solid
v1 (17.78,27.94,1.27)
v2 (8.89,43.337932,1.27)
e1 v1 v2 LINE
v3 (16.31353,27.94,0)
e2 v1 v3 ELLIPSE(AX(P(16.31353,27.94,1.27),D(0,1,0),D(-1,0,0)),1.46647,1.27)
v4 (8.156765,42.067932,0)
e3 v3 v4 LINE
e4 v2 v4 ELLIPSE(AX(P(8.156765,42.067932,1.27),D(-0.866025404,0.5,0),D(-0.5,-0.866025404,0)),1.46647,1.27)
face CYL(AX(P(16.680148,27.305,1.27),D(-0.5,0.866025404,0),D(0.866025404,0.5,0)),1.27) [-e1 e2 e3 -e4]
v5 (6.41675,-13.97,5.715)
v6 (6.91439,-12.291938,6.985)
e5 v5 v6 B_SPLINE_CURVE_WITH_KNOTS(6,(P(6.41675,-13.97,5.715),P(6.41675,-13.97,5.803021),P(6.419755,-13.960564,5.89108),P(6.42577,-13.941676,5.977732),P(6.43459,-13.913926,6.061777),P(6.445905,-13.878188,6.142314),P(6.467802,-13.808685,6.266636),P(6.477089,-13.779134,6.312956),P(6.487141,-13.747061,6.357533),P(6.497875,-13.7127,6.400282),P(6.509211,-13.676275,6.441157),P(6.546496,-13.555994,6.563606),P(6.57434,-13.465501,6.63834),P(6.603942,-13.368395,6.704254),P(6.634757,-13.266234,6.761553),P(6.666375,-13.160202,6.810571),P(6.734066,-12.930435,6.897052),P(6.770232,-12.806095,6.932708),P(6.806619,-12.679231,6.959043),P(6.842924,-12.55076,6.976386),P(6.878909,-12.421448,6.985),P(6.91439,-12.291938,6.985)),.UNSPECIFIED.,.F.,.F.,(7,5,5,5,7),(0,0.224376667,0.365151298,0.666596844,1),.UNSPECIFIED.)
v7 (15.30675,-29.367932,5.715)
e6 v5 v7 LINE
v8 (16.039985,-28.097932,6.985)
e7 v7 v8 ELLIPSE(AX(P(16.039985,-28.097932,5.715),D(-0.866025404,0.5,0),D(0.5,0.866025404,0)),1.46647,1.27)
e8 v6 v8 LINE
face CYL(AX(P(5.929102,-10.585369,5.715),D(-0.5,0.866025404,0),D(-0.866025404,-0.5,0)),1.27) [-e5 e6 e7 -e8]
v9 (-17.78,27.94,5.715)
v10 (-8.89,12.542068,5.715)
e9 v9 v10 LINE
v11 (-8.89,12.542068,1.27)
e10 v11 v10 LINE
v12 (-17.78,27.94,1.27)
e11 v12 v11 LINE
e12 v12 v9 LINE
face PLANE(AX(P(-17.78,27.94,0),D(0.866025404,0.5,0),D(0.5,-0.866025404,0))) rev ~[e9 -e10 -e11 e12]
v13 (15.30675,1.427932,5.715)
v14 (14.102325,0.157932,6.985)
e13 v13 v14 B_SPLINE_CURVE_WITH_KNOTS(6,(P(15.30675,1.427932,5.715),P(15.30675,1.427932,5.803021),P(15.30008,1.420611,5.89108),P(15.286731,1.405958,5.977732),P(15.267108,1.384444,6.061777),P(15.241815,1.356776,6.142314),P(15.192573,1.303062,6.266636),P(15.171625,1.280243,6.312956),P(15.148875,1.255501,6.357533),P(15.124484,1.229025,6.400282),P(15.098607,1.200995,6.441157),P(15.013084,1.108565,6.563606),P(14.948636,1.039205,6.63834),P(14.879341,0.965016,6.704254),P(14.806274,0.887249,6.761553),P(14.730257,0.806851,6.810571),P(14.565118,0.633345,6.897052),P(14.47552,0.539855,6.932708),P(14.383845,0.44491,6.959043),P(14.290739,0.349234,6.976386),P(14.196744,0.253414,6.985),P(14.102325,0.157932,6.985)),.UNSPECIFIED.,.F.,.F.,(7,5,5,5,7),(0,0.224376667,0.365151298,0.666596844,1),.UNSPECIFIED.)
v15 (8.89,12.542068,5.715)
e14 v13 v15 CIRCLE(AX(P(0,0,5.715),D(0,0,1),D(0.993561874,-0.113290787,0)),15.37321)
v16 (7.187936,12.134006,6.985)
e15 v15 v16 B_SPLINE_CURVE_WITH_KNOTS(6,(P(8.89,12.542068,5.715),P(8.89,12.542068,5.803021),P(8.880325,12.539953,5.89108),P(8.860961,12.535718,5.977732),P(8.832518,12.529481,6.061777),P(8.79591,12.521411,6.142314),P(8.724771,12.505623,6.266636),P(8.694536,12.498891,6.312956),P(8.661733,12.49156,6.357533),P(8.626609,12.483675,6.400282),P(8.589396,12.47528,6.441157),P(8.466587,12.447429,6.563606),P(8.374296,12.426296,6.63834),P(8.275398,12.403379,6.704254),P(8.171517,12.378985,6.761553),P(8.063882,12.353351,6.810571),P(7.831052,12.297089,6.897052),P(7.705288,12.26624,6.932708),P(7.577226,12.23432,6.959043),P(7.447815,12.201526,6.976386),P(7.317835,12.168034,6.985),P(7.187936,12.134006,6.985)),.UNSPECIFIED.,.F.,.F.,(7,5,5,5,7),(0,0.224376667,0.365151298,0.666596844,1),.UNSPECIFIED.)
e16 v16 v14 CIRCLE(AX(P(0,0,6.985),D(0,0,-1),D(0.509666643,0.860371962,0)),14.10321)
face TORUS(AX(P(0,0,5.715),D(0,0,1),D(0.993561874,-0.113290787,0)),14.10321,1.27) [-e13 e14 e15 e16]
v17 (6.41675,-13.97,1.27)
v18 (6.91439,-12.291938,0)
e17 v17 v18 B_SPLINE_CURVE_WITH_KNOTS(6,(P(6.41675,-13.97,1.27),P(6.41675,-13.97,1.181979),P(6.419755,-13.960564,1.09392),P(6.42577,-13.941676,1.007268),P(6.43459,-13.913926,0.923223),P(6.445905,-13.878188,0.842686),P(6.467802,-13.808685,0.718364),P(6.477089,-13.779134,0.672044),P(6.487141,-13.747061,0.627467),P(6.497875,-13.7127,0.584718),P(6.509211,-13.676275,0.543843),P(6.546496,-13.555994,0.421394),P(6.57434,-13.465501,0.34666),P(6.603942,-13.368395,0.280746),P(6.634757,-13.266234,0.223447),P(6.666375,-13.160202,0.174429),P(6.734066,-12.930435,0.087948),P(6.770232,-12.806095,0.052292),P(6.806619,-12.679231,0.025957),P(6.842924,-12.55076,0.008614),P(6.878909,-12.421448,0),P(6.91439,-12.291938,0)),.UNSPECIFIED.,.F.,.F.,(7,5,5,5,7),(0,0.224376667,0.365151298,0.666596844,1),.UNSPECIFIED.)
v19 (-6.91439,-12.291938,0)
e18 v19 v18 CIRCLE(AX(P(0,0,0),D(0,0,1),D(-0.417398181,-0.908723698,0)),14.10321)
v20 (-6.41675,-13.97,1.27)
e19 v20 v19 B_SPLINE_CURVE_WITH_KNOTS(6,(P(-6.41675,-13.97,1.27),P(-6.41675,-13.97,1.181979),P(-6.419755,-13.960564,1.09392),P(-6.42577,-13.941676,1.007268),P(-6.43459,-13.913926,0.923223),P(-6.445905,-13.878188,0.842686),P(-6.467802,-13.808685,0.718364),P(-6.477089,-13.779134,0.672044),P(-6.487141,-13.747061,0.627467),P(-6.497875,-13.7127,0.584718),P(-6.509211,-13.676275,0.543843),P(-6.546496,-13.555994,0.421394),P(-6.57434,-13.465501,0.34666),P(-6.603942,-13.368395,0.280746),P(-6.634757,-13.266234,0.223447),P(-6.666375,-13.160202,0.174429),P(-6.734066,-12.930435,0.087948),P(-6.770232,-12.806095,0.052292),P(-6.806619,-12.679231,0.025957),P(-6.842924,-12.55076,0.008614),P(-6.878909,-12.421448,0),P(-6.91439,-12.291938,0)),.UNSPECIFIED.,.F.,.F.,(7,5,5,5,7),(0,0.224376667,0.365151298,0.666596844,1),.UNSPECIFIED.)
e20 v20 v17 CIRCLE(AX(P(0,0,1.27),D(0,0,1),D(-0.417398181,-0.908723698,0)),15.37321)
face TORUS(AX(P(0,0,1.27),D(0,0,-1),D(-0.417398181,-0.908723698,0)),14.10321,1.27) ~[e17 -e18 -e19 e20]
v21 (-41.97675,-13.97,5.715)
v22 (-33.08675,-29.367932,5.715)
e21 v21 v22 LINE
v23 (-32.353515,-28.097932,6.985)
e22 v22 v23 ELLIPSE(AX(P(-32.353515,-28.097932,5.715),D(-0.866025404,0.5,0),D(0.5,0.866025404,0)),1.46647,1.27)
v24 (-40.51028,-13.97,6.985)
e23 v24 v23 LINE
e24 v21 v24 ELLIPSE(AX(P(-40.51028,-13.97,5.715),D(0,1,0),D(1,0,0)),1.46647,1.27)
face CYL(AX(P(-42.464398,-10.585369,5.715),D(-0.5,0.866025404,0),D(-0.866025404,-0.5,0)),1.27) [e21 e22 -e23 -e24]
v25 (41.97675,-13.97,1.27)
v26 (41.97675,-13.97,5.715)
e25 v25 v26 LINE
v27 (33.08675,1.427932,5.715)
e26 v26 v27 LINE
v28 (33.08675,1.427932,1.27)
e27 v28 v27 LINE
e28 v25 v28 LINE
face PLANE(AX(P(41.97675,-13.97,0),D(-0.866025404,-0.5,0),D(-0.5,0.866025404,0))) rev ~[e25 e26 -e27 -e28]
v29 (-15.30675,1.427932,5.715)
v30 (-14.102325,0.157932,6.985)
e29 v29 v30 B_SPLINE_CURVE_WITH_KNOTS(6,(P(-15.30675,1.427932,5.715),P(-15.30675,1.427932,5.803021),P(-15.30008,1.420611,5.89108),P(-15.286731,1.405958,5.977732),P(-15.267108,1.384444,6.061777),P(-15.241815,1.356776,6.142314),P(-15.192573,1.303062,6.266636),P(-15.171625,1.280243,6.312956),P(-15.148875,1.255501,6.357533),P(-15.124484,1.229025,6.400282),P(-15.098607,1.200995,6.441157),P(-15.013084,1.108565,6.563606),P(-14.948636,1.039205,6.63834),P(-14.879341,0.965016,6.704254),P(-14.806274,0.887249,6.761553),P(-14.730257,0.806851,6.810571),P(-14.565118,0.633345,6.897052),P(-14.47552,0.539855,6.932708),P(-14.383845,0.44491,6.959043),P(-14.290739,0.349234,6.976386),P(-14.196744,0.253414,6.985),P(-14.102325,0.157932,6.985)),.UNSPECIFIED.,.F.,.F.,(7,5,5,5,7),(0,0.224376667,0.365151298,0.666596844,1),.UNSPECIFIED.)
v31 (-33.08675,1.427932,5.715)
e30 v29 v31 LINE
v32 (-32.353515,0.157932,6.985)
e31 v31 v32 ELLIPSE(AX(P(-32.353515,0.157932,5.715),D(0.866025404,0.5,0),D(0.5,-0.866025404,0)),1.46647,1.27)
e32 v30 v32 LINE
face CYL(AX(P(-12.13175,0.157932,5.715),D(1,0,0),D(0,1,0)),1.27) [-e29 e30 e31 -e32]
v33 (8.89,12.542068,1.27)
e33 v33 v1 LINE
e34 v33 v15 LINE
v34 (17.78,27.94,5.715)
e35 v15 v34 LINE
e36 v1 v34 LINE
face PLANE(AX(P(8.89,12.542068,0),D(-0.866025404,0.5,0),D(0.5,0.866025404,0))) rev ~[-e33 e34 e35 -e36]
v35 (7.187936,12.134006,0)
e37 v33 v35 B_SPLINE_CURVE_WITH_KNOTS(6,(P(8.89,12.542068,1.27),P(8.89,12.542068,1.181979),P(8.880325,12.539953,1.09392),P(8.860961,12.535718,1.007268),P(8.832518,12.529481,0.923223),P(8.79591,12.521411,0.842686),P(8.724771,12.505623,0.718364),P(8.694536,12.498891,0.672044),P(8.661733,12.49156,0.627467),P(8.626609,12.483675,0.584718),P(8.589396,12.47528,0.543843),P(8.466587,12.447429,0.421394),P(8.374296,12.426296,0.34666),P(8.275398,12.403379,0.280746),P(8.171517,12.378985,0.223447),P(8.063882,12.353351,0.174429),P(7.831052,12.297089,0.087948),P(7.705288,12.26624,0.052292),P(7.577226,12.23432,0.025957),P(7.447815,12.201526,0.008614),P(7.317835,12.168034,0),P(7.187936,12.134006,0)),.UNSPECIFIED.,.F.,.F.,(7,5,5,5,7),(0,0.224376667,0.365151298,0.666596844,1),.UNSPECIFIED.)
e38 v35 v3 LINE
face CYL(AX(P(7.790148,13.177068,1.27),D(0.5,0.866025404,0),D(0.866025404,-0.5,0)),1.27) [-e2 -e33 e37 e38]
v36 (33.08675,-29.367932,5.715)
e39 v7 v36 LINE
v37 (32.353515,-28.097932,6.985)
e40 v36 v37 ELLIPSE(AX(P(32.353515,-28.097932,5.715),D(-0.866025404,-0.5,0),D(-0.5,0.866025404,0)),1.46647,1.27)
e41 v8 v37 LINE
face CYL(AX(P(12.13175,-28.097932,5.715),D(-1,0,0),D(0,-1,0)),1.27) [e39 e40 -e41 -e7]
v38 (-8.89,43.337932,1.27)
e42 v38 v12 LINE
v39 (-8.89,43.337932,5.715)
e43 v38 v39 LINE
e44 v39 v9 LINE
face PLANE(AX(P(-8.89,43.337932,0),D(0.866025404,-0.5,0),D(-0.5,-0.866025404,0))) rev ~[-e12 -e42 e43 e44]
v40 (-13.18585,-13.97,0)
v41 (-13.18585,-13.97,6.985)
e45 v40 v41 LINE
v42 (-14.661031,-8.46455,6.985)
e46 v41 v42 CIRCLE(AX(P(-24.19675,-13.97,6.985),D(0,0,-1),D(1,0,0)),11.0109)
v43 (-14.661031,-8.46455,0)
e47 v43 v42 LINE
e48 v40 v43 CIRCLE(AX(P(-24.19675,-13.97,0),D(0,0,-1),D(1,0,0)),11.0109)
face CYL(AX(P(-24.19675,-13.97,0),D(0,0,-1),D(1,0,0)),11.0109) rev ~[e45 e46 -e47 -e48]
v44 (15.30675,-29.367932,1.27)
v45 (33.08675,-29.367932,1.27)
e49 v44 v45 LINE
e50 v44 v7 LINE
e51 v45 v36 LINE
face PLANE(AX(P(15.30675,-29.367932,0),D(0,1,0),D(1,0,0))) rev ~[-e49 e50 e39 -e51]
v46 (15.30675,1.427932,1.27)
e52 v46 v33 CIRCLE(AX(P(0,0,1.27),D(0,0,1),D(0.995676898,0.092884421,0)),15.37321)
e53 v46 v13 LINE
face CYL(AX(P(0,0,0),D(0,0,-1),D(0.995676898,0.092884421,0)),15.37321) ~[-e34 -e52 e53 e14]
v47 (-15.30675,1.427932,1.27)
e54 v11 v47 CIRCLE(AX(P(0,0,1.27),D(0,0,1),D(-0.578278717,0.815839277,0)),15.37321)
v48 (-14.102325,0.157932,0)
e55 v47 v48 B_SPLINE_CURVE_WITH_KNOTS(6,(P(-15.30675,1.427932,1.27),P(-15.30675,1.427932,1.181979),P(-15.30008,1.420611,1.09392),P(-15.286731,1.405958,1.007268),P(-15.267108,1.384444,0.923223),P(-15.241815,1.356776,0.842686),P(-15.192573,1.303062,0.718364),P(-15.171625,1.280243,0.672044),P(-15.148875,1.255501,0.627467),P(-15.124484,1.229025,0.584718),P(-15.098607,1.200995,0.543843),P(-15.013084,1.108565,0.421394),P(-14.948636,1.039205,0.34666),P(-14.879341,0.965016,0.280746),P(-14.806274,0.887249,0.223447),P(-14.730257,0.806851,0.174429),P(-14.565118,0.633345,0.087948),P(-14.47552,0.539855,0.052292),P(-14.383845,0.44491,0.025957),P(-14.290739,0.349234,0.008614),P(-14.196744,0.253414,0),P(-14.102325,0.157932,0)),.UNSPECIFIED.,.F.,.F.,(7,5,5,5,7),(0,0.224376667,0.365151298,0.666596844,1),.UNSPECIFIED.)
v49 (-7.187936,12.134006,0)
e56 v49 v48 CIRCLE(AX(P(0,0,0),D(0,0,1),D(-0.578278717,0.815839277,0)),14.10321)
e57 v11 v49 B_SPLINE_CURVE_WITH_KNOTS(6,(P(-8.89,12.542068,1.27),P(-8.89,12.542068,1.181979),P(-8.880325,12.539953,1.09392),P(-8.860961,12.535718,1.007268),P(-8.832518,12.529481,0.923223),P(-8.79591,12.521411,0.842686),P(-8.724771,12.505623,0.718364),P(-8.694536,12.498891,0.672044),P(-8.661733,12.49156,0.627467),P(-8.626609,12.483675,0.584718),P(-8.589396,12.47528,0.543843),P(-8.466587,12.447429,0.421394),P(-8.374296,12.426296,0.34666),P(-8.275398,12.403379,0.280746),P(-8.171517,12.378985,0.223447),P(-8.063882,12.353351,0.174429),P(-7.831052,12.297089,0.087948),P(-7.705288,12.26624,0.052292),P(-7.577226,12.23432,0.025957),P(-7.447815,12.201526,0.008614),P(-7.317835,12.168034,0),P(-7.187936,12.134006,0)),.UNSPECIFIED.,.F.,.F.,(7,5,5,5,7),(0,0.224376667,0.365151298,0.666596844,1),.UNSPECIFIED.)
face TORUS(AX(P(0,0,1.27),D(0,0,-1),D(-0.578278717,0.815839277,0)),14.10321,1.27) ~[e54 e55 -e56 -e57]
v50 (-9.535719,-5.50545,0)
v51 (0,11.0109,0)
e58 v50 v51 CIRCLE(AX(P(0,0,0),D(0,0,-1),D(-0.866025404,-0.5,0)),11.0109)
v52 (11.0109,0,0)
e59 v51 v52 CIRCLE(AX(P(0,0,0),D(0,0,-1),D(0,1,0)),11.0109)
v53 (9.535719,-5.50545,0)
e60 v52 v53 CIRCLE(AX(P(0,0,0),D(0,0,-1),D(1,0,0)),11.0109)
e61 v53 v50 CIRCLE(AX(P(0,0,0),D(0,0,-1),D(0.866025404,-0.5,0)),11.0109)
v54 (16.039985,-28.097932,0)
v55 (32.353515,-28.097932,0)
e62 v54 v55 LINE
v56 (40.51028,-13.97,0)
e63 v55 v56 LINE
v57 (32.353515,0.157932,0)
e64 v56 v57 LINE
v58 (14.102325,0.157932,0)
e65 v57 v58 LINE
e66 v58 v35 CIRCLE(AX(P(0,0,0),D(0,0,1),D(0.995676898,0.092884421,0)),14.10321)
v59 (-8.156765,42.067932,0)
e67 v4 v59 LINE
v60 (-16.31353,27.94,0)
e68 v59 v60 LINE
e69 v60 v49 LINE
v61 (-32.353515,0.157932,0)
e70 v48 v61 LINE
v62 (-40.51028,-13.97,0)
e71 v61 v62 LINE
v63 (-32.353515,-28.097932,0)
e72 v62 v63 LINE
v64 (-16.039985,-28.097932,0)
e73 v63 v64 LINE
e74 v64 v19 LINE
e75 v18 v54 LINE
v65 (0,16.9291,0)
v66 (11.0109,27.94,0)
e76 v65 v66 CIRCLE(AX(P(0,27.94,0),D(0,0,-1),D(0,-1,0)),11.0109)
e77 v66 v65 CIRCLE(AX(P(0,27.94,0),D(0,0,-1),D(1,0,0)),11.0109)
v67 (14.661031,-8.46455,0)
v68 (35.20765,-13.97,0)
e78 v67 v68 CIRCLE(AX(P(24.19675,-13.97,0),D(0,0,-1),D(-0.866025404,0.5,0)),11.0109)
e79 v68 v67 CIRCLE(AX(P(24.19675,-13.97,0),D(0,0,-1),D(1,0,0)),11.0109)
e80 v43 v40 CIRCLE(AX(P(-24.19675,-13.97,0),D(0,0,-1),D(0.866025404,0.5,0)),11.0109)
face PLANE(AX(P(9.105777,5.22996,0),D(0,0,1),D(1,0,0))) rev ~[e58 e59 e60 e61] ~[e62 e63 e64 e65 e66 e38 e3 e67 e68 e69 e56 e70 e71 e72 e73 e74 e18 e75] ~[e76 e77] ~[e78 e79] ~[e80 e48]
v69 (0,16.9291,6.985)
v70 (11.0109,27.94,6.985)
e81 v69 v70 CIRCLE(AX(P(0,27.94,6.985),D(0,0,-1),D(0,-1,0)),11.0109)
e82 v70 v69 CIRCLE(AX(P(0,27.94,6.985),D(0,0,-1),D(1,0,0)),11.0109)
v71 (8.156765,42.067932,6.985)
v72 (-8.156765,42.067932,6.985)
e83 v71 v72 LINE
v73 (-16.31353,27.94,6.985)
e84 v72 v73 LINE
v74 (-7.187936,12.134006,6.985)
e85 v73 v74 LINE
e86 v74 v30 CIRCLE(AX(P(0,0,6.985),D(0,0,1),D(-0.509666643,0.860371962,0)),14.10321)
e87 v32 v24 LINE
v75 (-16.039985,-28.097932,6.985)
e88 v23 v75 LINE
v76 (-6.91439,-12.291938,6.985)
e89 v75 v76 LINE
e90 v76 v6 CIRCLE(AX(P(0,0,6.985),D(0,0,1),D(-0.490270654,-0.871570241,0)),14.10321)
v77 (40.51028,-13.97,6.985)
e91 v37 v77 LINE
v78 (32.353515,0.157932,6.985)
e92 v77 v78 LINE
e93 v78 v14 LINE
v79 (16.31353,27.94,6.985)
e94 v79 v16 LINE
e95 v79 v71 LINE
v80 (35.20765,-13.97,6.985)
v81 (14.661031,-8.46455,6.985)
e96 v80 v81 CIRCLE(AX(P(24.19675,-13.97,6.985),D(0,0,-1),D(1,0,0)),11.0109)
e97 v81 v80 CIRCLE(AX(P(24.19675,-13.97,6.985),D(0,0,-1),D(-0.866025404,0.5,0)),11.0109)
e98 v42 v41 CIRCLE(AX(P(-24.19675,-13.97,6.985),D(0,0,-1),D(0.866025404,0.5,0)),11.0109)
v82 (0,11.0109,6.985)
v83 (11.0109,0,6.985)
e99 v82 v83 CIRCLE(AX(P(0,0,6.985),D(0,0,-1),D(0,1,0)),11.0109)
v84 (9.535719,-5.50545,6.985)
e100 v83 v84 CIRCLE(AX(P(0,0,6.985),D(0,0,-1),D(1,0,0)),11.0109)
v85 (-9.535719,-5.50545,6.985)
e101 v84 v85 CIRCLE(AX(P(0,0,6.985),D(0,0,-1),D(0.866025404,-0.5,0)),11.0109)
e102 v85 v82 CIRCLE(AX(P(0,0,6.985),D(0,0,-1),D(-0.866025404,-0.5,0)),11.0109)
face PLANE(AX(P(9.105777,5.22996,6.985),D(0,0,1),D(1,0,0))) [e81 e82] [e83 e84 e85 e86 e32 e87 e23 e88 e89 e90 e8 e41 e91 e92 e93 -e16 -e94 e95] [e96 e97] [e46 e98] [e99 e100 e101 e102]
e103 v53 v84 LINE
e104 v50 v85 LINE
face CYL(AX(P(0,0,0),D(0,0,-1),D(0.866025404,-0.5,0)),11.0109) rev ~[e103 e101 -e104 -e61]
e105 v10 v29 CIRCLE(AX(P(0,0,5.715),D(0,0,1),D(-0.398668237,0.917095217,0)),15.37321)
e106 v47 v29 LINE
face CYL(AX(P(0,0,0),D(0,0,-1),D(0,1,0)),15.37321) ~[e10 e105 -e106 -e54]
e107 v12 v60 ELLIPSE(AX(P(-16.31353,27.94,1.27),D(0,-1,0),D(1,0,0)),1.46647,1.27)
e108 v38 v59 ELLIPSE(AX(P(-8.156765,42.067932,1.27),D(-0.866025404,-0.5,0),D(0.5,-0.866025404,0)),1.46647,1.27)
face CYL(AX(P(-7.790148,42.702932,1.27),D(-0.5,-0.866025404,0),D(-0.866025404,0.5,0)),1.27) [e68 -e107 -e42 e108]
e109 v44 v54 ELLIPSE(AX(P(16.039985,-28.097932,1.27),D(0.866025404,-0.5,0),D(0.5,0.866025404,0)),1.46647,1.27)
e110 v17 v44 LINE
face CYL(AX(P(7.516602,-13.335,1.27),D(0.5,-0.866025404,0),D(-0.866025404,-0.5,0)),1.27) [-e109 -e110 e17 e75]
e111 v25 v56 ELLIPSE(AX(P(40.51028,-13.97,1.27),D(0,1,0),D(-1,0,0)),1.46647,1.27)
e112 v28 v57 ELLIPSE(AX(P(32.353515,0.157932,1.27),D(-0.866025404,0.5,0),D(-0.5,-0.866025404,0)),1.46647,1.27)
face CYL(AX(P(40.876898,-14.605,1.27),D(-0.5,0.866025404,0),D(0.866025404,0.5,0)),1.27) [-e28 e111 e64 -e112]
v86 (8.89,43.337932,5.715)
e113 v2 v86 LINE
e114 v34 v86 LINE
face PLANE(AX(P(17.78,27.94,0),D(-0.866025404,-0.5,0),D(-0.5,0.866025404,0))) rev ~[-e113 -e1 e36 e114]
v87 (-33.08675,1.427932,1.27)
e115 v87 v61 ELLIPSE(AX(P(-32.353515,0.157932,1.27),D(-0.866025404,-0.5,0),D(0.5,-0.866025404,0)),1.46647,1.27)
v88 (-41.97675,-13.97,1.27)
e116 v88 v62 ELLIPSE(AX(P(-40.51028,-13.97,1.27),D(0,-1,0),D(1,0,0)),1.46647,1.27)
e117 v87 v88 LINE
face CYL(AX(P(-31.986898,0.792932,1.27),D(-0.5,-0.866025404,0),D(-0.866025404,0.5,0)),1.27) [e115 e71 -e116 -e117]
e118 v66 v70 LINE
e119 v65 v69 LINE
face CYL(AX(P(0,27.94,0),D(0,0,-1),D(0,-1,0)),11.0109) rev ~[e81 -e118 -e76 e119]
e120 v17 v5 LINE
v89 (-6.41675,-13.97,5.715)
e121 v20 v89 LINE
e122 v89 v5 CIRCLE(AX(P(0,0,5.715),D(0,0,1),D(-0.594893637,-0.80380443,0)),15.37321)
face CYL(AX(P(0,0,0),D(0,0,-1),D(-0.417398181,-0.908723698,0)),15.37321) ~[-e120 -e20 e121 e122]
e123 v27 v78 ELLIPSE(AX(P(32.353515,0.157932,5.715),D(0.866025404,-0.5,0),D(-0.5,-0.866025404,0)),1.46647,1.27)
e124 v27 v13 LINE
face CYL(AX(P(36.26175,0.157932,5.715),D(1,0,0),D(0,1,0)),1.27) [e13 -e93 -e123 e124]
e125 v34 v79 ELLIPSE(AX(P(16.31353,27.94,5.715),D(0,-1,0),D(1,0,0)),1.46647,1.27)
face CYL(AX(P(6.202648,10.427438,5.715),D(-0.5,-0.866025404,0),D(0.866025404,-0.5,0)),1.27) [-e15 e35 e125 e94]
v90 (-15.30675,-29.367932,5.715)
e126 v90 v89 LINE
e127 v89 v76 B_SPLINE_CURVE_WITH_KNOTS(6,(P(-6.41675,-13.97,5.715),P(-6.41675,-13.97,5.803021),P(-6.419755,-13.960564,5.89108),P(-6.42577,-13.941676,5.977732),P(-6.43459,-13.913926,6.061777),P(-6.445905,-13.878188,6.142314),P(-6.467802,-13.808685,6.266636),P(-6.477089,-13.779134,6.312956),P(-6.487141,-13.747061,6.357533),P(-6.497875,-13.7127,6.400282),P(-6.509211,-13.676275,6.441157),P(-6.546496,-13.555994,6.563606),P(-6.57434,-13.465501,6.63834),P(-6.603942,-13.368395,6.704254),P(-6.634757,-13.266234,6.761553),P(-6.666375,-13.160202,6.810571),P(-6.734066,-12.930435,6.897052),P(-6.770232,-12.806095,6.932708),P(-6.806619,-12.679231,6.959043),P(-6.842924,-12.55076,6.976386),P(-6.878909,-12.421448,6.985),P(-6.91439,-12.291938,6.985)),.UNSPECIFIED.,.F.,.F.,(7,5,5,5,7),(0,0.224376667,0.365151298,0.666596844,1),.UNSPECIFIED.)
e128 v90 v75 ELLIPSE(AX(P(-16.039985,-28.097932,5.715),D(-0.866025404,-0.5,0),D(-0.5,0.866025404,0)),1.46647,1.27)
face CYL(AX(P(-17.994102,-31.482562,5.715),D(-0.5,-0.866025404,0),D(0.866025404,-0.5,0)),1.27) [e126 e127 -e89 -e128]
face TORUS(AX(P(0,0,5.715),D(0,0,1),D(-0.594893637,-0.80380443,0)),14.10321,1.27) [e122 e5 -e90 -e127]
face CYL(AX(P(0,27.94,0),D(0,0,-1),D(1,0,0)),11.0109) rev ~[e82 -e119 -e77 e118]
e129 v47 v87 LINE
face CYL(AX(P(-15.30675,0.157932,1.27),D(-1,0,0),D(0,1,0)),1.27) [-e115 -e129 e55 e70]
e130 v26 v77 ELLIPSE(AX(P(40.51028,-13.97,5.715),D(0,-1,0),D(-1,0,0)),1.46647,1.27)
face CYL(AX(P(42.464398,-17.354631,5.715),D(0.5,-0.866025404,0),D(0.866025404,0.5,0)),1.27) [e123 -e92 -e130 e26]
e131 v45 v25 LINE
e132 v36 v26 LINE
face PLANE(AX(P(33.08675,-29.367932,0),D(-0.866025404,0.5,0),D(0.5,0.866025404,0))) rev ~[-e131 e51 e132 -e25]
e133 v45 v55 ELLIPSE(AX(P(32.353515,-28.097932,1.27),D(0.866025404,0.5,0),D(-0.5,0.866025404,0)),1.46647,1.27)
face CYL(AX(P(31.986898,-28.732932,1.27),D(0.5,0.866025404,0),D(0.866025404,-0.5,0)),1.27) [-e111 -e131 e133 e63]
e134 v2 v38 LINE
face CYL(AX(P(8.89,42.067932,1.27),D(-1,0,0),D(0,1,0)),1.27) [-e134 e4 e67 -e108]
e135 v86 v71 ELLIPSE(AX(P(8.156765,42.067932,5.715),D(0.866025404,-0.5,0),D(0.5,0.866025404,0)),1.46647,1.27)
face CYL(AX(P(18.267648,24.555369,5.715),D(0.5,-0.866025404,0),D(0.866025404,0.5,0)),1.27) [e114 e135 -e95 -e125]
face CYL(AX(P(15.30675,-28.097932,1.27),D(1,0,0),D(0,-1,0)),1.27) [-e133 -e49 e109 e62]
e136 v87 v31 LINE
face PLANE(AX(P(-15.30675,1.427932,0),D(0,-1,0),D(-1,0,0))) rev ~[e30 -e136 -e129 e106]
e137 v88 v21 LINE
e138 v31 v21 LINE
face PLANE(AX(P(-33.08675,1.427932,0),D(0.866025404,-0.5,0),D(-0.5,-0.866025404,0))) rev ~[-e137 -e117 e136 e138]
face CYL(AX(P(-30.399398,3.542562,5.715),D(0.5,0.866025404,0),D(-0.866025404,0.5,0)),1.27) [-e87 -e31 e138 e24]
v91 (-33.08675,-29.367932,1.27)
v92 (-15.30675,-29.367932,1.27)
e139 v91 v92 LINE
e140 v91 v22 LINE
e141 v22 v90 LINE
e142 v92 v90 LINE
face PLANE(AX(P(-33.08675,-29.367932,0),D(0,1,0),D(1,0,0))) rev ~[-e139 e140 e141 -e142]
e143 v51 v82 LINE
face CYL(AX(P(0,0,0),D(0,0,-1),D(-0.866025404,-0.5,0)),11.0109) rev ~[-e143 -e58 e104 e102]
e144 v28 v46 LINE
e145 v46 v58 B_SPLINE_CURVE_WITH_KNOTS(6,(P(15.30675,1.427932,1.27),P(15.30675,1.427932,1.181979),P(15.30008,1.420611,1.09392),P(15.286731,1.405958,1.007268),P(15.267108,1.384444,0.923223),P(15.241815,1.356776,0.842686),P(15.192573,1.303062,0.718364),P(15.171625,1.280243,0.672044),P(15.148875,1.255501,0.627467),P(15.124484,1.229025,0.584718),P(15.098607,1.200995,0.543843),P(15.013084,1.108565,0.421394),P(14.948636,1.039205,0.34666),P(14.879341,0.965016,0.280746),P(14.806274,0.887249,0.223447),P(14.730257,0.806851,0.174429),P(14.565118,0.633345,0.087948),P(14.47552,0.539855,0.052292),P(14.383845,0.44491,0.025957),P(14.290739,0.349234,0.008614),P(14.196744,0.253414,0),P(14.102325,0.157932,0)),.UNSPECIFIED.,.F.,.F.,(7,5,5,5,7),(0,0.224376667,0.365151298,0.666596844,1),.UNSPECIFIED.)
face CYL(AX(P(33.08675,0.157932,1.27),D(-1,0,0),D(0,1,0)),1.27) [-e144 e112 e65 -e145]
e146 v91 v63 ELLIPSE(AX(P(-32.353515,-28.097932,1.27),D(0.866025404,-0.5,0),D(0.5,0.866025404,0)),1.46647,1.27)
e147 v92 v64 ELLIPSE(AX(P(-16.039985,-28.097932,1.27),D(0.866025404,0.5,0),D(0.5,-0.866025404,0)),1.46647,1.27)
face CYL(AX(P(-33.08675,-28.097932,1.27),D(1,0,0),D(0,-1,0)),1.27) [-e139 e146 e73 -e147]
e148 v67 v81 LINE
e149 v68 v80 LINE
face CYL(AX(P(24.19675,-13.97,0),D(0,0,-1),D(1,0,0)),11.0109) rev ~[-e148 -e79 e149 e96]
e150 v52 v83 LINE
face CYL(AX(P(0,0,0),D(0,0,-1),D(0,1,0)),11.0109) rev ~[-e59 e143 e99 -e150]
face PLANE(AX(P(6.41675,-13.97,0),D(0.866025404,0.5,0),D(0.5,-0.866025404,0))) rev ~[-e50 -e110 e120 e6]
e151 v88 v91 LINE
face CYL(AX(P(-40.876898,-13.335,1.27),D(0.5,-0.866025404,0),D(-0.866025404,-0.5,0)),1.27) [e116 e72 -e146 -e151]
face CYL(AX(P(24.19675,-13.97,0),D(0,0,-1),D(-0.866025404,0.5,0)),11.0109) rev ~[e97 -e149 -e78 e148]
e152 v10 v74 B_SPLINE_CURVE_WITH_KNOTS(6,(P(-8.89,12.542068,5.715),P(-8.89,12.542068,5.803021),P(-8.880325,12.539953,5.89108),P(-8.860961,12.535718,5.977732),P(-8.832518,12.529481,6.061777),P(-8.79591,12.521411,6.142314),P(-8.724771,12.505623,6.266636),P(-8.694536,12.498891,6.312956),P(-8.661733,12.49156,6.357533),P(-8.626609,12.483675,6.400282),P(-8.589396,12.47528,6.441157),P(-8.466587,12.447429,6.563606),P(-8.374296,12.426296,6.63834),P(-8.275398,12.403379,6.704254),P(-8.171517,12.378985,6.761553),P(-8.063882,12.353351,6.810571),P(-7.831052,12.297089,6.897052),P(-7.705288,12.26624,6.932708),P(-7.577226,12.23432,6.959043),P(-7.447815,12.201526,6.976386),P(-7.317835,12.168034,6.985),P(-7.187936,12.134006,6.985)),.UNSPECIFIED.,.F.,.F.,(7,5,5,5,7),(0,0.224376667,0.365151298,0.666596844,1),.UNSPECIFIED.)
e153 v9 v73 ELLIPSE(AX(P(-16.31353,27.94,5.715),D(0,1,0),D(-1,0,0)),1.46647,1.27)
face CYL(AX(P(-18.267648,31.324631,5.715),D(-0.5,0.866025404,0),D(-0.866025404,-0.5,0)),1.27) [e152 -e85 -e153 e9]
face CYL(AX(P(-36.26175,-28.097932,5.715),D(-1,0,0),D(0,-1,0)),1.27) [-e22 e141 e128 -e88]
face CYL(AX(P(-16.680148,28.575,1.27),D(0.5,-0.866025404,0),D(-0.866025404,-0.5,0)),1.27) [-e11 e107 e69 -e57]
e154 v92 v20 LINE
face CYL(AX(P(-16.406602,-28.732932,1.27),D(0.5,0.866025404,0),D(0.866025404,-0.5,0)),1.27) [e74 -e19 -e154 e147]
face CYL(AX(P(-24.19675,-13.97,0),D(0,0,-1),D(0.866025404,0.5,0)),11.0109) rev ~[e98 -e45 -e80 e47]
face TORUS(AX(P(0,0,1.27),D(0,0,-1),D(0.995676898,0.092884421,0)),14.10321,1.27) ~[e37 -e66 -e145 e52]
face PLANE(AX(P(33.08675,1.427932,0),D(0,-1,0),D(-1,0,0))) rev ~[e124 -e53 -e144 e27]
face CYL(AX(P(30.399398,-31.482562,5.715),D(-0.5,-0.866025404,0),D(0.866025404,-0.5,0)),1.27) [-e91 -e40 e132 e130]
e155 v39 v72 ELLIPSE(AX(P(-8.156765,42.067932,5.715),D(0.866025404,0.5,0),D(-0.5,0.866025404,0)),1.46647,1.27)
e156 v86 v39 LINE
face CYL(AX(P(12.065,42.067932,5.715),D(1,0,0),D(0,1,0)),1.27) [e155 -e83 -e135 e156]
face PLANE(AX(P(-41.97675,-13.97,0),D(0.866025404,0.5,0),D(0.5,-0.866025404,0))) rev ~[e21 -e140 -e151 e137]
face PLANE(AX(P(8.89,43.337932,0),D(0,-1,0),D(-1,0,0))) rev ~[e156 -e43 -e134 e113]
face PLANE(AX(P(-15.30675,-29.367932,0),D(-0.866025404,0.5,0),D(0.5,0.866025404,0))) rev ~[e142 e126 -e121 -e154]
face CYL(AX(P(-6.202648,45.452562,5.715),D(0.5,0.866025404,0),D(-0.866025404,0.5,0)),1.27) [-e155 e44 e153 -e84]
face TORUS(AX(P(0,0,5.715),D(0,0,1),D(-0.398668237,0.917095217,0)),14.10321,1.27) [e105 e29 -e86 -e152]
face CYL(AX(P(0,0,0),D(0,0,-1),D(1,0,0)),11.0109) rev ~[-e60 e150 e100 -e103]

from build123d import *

# Parameters (mm, degrees)
F1_DEPTH      = 6.985
F2_T3_DEPTH   = 24.13
F2_S4_R       = 15.3732097417
F2_T5_DEPTH   = 14
F2_T8_DEPTH   = 24.13
F2_T11_DEPTH  = 24.13
F2_T14_DEPTH  = 24.13
F2_T17_DEPTH  = 24.13
F2_S18_R      = 15.3732097417
F2_T19_DEPTH  = 14
F2_T22_ANGLE  = 73.0101001262
F2_T27_ANGLE  = 73.0101001262
F2_T32_DEPTH  = 24.13
F2_S33_R      = 15.3732097417
F2_T34_DEPTH  = 14
F2_T37_DEPTH  = 24.13
F2_T40_DEPTH  = 24.13
F2_T43_DEPTH  = 24.13
F2_T46_ANGLE  = 73.0101001262
F2_T51_DEPTH  = 24.13
F2_S52_R      = 15.3732097417
F2_T53_DEPTH  = 14
F2_T56_DEPTH  = 24.13
F2_T59_DEPTH  = 24.13
F2_T62_DEPTH  = 24.13
F2_T65_DEPTH  = 24.13
F2_S66_R      = 15.3732097417
F2_T67_DEPTH  = 14
F2_T70_DEPTH  = 24.13
F2_S71_R      = 15.3732097417
F2_T72_DEPTH  = 14
F2_T76_DEPTH  = 24.13
F2_S77_R      = 15.3732097417
F2_T78_DEPTH  = 14
F2_T81_ANGLE  = 73.0101001262
F2_T87_DEPTH  = 24.13
F2_S88_R      = 15.3732097417
F2_T89_DEPTH  = 14
F2_T92_ANGLE  = 73.0101001262
F2_T98_DEPTH  = 24.13
F2_S99_R      = 15.3732097417
F2_T100_DEPTH = 14
F2_T103_ANGLE = 73.0101001262
F2_T109_ANGLE = 73.0101001262
F2_T113_DEPTH = 24.13
F2_S114_R     = 15.3732097417
F2_T115_DEPTH = 14
F2_T120_DEPTH = 24.13
F2_S121_R     = 15.3732097417
F2_T122_DEPTH = 14
F2_T125_ANGLE = 73.0101001262
F2_T131_ANGLE = 73.0101001262
F2_T135_DEPTH = 24.13
F2_S136_R     = 15.3732097417
F2_T137_DEPTH = 14
F3_R          = 1.27


# Not quite as in the source:
# - a fillet or chamfer that OpenCascade refuses, or shapes differently, is made with other operations: its cross-section is extruded or revolved along the edge and cut away or added


with BuildPart() as f1:
    # F0 (on Top) → F1 (new body)
    with BuildSketch(Plane.XY):
        with BuildLine():
            ThreePointArc((0, 11.0109), (7.785882057, 7.785882057), (11.0109, 0))
            ThreePointArc((11.0109, 0), (10.6357126807, -2.8498306237), (9.5357191185, -5.50545))
            Line((9.5357191185, -5.50545), (10.8617497817, -6.2710341604))
            Line((10.8617497817, -6.2710341604), (15.3067497817, 1.4279316793))
            ThreePointArc((15.3067497817, 1.4279316793), (13.313590174, 7.6866048708), (8.89, 12.5420683207))
            Line((8.89, 12.5420683207), (0, 12.5420683207))
            Line((0, 12.5420683207), (0, 11.0109))
        make_face()
        with BuildLine():
            ThreePointArc((-9.5357191185, -5.50545), (-9.5357191185, 5.50545), (0, 11.0109))
            Line((0, 11.0109), (0, 12.5420683207))
            Line((0, 12.5420683207), (-8.89, 12.5420683207))
            ThreePointArc((-8.89, 12.5420683207), (-13.313590174, 7.6866048708), (-15.3067497817, 1.4279316793))
            Line((-15.3067497817, 1.4279316793), (-10.8617497817, -6.2710341604))
            Line((-10.8617497817, -6.2710341604), (-9.5357191185, -5.50545))
        make_face()
        with BuildLine():
            Line((10.8617497817, -6.2710341604), (9.5357191185, -5.50545))
            ThreePointArc((9.5357191185, -5.50545), (0, -11.0109), (-9.5357191185, -5.50545))
            Line((-9.5357191185, -5.50545), (-10.8617497817, -6.2710341604))
            Line((-10.8617497817, -6.2710341604), (-6.4167497817, -13.97))
            ThreePointArc((-6.4167497817, -13.97), (0, -15.3732097417), (6.4167497817, -13.97))
            Line((6.4167497817, -13.97), (10.8617497817, -6.2710341604))
        make_face()
        with BuildLine():
            Line((-8.89, 12.5420683207), (0, 12.5420683207))
            Line((0, 12.5420683207), (0, 15.3732097417))
            ThreePointArc((0, 15.3732097417), (-4.6649614614, 14.648334797), (-8.89, 12.5420683207))
        make_face()
        with BuildLine():
            Line((0, 15.3732097417), (0, 12.5420683207))
            Line((0, 12.5420683207), (8.89, 12.5420683207))
            ThreePointArc((8.89, 12.5420683207), (4.6649614614, 14.648334797), (0, 15.3732097417))
        make_face()
        with BuildLine():
            Line((15.3067497817, 1.4279316793), (10.8617497817, -6.2710341604))
            Line((10.8617497817, -6.2710341604), (13.313590174, -7.6866048708))
            ThreePointArc((13.313590174, -7.6866048708), (14.8493803224, -3.9788794655), (15.3732097417, 0))
            ThreePointArc((15.3732097417, 0), (15.3565857634, 0.7147387297), (15.3067497817, 1.4279316793))
        make_face()
        with BuildLine():
            Line((13.313590174, -7.6866048708), (10.8617497817, -6.2710341604))
            Line((10.8617497817, -6.2710341604), (6.4167497817, -13.97))
            ThreePointArc((6.4167497817, -13.97), (10.3533493266, -11.3641425318), (13.313590174, -7.6866048708))
        make_face()
        with BuildLine():
            Line((-6.4167497817, -13.97), (-10.8617497817, -6.2710341604))
            Line((-10.8617497817, -6.2710341604), (-13.313590174, -7.6866048708))
            ThreePointArc((-13.313590174, -7.6866048708), (-10.3533493266, -11.3641425318), (-6.4167497817, -13.97))
        make_face()
        with BuildLine():
            Line((-13.313590174, -7.6866048708), (-10.8617497817, -6.2710341604))
            Line((-10.8617497817, -6.2710341604), (-15.3067497817, 1.4279316793))
            ThreePointArc((-15.3067497817, 1.4279316793), (-15.018310788, -3.2841922653), (-13.313590174, -7.6866048708))
        make_face()
        with BuildLine():
            ThreePointArc((-8.89, 12.5420683207), (-4.6649614614, 14.648334797), (0, 15.3732097417))
            ThreePointArc((0, 15.3732097417), (4.6649614614, 14.648334797), (8.89, 12.5420683207))
            Line((8.89, 12.5420683207), (17.78, 27.94))
            Line((17.78, 27.94), (8.89, 43.3379316793))
            Line((8.89, 43.3379316793), (-8.89, 43.3379316793))
            Line((-8.89, 43.3379316793), (-17.78, 27.94))
            Line((-17.78, 27.94), (-8.89, 12.5420683207))
        make_face()
        with BuildLine():
            ThreePointArc((11.0109, 27.94), (7.785882057, 20.154117943), (0, 16.9291))
            ThreePointArc((0, 16.9291), (-7.785882057, 35.725882057), (11.0109, 27.94))
        make_face(mode=Mode.SUBTRACT)
        with BuildLine():
            ThreePointArc((15.3732097417, 0), (14.8493803224, -3.9788794655), (13.313590174, -7.6866048708))
            ThreePointArc((13.313590174, -7.6866048708), (10.3533493266, -11.3641425318), (6.4167497817, -13.97))
            Line((6.4167497817, -13.97), (15.3067497817, -29.3679316793))
            Line((15.3067497817, -29.3679316793), (33.0867497817, -29.3679316793))
            Line((33.0867497817, -29.3679316793), (41.9767497817, -13.97))
            Line((41.9767497817, -13.97), (33.0867497817, 1.4279316793))
            Line((33.0867497817, 1.4279316793), (15.3067497817, 1.4279316793))
            ThreePointArc((15.3067497817, 1.4279316793), (15.3565857634, 0.7147387297), (15.3732097417, 0))
        make_face()
        with BuildLine():
            ThreePointArc((35.2076497817, -13.97), (21.346919158, -24.6057126807), (14.6610306632, -8.46455))
            ThreePointArc((14.6610306632, -8.46455), (27.0465804055, -3.3342873193), (35.2076497817, -13.97))
        make_face(mode=Mode.SUBTRACT)
        with BuildLine():
            ThreePointArc((-6.4167497817, -13.97), (-10.3533493266, -11.3641425318), (-13.313590174, -7.6866048708))
            ThreePointArc((-13.313590174, -7.6866048708), (-15.018310788, -3.2841922653), (-15.3067497817, 1.4279316793))
            Line((-15.3067497817, 1.4279316793), (-33.0867497817, 1.4279316793))
            Line((-33.0867497817, 1.4279316793), (-41.9767497817, -13.97))
            Line((-41.9767497817, -13.97), (-33.0867497817, -29.3679316793))
            Line((-33.0867497817, -29.3679316793), (-15.3067497817, -29.3679316793))
            Line((-15.3067497817, -29.3679316793), (-6.4167497817, -13.97))
        make_face()
        with BuildLine():
            ThreePointArc((-13.1858497817, -13.97), (-34.8324624624, -16.8198306237), (-14.6610306632, -8.46455))
            ThreePointArc((-14.6610306632, -8.46455), (-13.5610371011, -11.1201693763), (-13.1858497817, -13.97))
        make_face(mode=Mode.SUBTRACT)
    extrude(amount=F1_DEPTH)

    # F2: fillet of radius 1.27 on 18 edges, made by hand


with BuildPart() as f2_tool1:
    # F2_s2 → F2_t3 (new body)
    with BuildSketch(Plane(origin=(-18.1308748909, 31.4035964967, 0), x_dir=(0, 0, 1), z_dir=(0.5, -0.8660254038, 0))):
        with BuildLine():
            ThreePointArc((5.715, 1.4279316793), (6.6130256121, 1.0559572914), (6.985, 0.1579316793))
            Line((6.985, 0.1579316793), (6.985, 1.4279316793))
            Line((6.985, 1.4279316793), (5.715, 1.4279316793))
        make_face()
    extrude(amount=F2_T3_DEPTH)

    # F2_s4 → F2_t5 (cut, symmetric)
    with BuildSketch(Plane.XY.offset(6.4)):
        Circle(F2_S4_R)
    extrude(amount=F2_T5_DEPTH, both=True, mode=Mode.SUBTRACT)


with BuildPart() as f2_tool6:
    # F2_s7 → F2_t8 (new body)
    with BuildSketch(Plane(origin=(18.1308748909, 31.4035964967, 0), x_dir=(0, 0, 1), z_dir=(-0.5, -0.8660254038, 0))):
        with BuildLine():
            ThreePointArc((5.715, 29.3679316793), (6.6130256121, 28.9959572914), (6.985, 28.0979316793))
            Line((6.985, 28.0979316793), (6.985, 29.3679316793))
            Line((6.985, 29.3679316793), (5.715, 29.3679316793))
        make_face()
    extrude(amount=F2_T8_DEPTH)


with BuildPart() as f2_tool9:
    # F2_s10 → F2_t11 (new body)
    with BuildSketch(Plane.YZ.offset(12.065)):
        with BuildLine():
            ThreePointArc((43.3379316793, 5.715), (42.9659572914, 6.6130256121), (42.0679316793, 6.985))
            Line((42.0679316793, 6.985), (43.3379316793, 6.985))
            Line((43.3379316793, 6.985), (43.3379316793, 5.715))
        make_face()
    extrude(amount=-F2_T11_DEPTH)


with BuildPart() as f2_tool12:
    # F2_s13 → F2_t14 (new body)
    with BuildSketch(Plane(origin=(-6.0658748909, 10.5064035033, 0), x_dir=(0, 0, 1), z_dir=(-0.5, 0.8660254038, 0))):
        with BuildLine():
            ThreePointArc((5.715, 29.3679316793), (6.6130256121, 28.9959572914), (6.985, 28.0979316793))
            Line((6.985, 28.0979316793), (6.985, 29.3679316793))
            Line((6.985, 29.3679316793), (5.715, 29.3679316793))
        make_face()
    extrude(amount=F2_T14_DEPTH)


with BuildPart() as f2_tool15:
    # F2_s16 → F2_t17 (new body)
    with BuildSketch(Plane(origin=(6.0658748909, 10.5064035033, 0), x_dir=(0, 0, 1), z_dir=(0.5, 0.8660254038, 0))):
        with BuildLine():
            ThreePointArc((5.715, 1.4279316793), (6.6130256121, 1.0559572914), (6.985, 0.1579316793))
            Line((6.985, 0.1579316793), (6.985, 1.4279316793))
            Line((6.985, 1.4279316793), (5.715, 1.4279316793))
        make_face()
    extrude(amount=F2_T17_DEPTH)

    # F2_s18 → F2_t19 (cut, symmetric)
    with BuildSketch(Plane.XY.offset(6.4)):
        Circle(F2_S18_R)
    extrude(amount=F2_T19_DEPTH, both=True, mode=Mode.SUBTRACT)


with BuildPart() as f2_tool20:
    # F2_s21 → F2_t22 (revolve)
    with BuildSketch(Plane(origin=(0, 0, 0), x_dir=(0, 0, 1), z_dir=(-0.113290787, -0.9935618741, 0))):
        with BuildLine():
            ThreePointArc((5.715, -15.3732097417), (6.6130256121, -15.0012353538), (6.985, -14.1032097417))
            Line((6.985, -14.1032097417), (6.985, -15.3732097417))
            Line((6.985, -15.3732097417), (5.715, -15.3732097417))
        make_face()
    revolve(axis=Axis((0, 0, 6.985), (0, 0, 1)), revolution_arc=F2_T22_ANGLE)

    split(bisect_by=Plane(origin=(1.2366251091, -0.7139658396, 0), x_dir=(0, 0, 1), z_dir=(0.8660254038, -0.5, 0)), keep=Keep.TOP)

    split(bisect_by=Plane.XZ.offset(-1.4279316793), keep=Keep.BOTTOM)


with BuildPart() as f2_tool25:
    # F2_s26 → F2_t27 (revolve)
    with BuildSketch(Plane(origin=(0, 0, 0), x_dir=(0, 0, 1), z_dir=(0.9170952167, 0.3986682375, 0))):
        with BuildLine():
            ThreePointArc((5.715, -15.3732097417), (6.6130256121, -15.0012353538), (6.985, -14.1032097417))
            Line((6.985, -14.1032097417), (6.985, -15.3732097417))
            Line((6.985, -15.3732097417), (5.715, -15.3732097417))
        make_face()
    revolve(axis=Axis((0, 0, 6.985), (0, 0, 1)), revolution_arc=F2_T27_ANGLE)

    split(bisect_by=Plane(origin=(-1.2366251091, -0.7139658396, 0), x_dir=(0, 0, 1), z_dir=(-0.8660254038, -0.5, 0)), keep=Keep.TOP)

    split(bisect_by=Plane.XZ.offset(-1.4279316793), keep=Keep.BOTTOM)


with BuildPart() as f2_tool30:
    # F2_s31 → F2_t32 (new body)
    with BuildSketch(Plane.YZ.offset(-12.1317497817)):
        with BuildLine():
            ThreePointArc((1.4279316793, 5.715), (1.0559572914, 6.6130256121), (0.1579316793, 6.985))
            Line((0.1579316793, 6.985), (1.4279316793, 6.985))
            Line((1.4279316793, 6.985), (1.4279316793, 5.715))
        make_face()
    extrude(amount=-F2_T32_DEPTH)

    # F2_s33 → F2_t34 (cut, symmetric)
    with BuildSketch(Plane.XY.offset(6.4)):
        Circle(F2_S33_R)
    extrude(amount=F2_T34_DEPTH, both=True, mode=Mode.SUBTRACT)


with BuildPart() as f2_tool35:
    # F2_s36 → F2_t37 (new body)
    with BuildSketch(Plane(origin=(-6.0658748909, -10.5064035033, 0), x_dir=(0, 0, 1), z_dir=(-0.5, -0.8660254038, 0))):
        with BuildLine():
            ThreePointArc((5.715, 29.3679316793), (6.6130256121, 28.9959572914), (6.985, 28.0979316793))
            Line((6.985, 28.0979316793), (6.985, 29.3679316793))
            Line((6.985, 29.3679316793), (5.715, 29.3679316793))
        make_face()
    extrude(amount=F2_T37_DEPTH)


with BuildPart() as f2_tool38:
    # F2_s39 → F2_t40 (new body)
    with BuildSketch(Plane(origin=(-6.0325, 10.4485964967, 0), x_dir=(0, 0, 1), z_dir=(0.5, -0.8660254038, 0))):
        with BuildLine():
            ThreePointArc((5.715, 43.3379316793), (6.6130256121, 42.9659572914), (6.985, 42.0679316793))
            Line((6.985, 42.0679316793), (6.985, 43.3379316793))
            Line((6.985, 43.3379316793), (5.715, 43.3379316793))
        make_face()
    extrude(amount=F2_T40_DEPTH)


with BuildPart() as f2_tool41:
    # F2_s42 → F2_t43 (new body)
    with BuildSketch(Plane.YZ.offset(-36.2617497817)):
        with BuildLine():
            ThreePointArc((-29.3679316793, 5.715), (-28.9959572914, 6.6130256121), (-28.0979316793, 6.985))
            Line((-28.0979316793, 6.985), (-29.3679316793, 6.985))
            Line((-29.3679316793, 6.985), (-29.3679316793, 5.715))
        make_face()
    extrude(amount=F2_T43_DEPTH)


with BuildPart() as f2_tool44:
    # F2_s45 → F2_t46 (revolve)
    with BuildSketch(Plane(origin=(0, 0, 0), x_dir=(0, 0, 1), z_dir=(-0.8038044297, 0.5948936366, 0))):
        with BuildLine():
            ThreePointArc((5.715, -15.3732097417), (6.6130256121, -15.0012353538), (6.985, -14.1032097417))
            Line((6.985, -14.1032097417), (6.985, -15.3732097417))
            Line((6.985, -15.3732097417), (5.715, -15.3732097417))
        make_face()
    revolve(axis=Axis((0, 0, 6.985), (0, 0, 1)), revolution_arc=F2_T46_ANGLE)

    split(bisect_by=Plane(origin=(1.2366251091, -0.7139658396, 0), x_dir=(0, 0, 1), z_dir=(0.8660254038, -0.5, 0)), keep=Keep.TOP)

    split(bisect_by=Plane(origin=(-1.2366251091, -0.7139658396, 0), x_dir=(0, 0, 1), z_dir=(-0.8660254038, -0.5, 0)), keep=Keep.TOP)


with BuildPart() as f2_tool49:
    # F2_s50 → F2_t51 (new body)
    with BuildSketch(Plane(origin=(6.0658748909, -10.5064035033, 0), x_dir=(0, 0, 1), z_dir=(0.5, -0.8660254038, 0))):
        with BuildLine():
            ThreePointArc((5.715, 1.4279316793), (6.6130256121, 1.0559572914), (6.985, 0.1579316793))
            Line((6.985, 0.1579316793), (6.985, 1.4279316793))
            Line((6.985, 1.4279316793), (5.715, 1.4279316793))
        make_face()
    extrude(amount=F2_T51_DEPTH)

    # F2_s52 → F2_t53 (cut, symmetric)
    with BuildSketch(Plane.XY.offset(6.4)):
        Circle(F2_S52_R)
    extrude(amount=F2_T53_DEPTH, both=True, mode=Mode.SUBTRACT)


with BuildPart() as f2_tool54:
    # F2_s55 → F2_t56 (new body)
    with BuildSketch(Plane.YZ.offset(12.1317497817)):
        with BuildLine():
            ThreePointArc((-29.3679316793, 5.715), (-28.9959572914, 6.6130256121), (-28.0979316793, 6.985))
            Line((-28.0979316793, 6.985), (-29.3679316793, 6.985))
            Line((-29.3679316793, 6.985), (-29.3679316793, 5.715))
        make_face()
    extrude(amount=F2_T56_DEPTH)


with BuildPart() as f2_tool57:
    # F2_s58 → F2_t59 (new body)
    with BuildSketch(Plane(origin=(-6.0325, -10.4485964967, 0), x_dir=(0, 0, 1), z_dir=(0.5, 0.8660254038, 0))):
        with BuildLine():
            ThreePointArc((5.715, 43.3379316793), (6.6130256121, 42.9659572914), (6.985, 42.0679316793))
            Line((6.985, 42.0679316793), (6.985, 43.3379316793))
            Line((6.985, 43.3379316793), (5.715, 43.3379316793))
        make_face()
    extrude(amount=F2_T59_DEPTH)


with BuildPart() as f2_tool60:
    # F2_s61 → F2_t62 (new body)
    with BuildSketch(Plane(origin=(18.1308748909, -31.4035964967, 0), x_dir=(0, 0, 1), z_dir=(-0.5, 0.8660254038, 0))):
        with BuildLine():
            ThreePointArc((5.715, 29.3679316793), (6.6130256121, 28.9959572914), (6.985, 28.0979316793))
            Line((6.985, 28.0979316793), (6.985, 29.3679316793))
            Line((6.985, 29.3679316793), (5.715, 29.3679316793))
        make_face()
    extrude(amount=F2_T62_DEPTH)


with BuildPart() as f2_tool63:
    # F2_s64 → F2_t65 (new body)
    with BuildSketch(Plane.YZ.offset(36.2617497817)):
        with BuildLine():
            ThreePointArc((1.4279316793, 5.715), (1.0559572914, 6.6130256121), (0.1579316793, 6.985))
            Line((0.1579316793, 6.985), (1.4279316793, 6.985))
            Line((1.4279316793, 6.985), (1.4279316793, 5.715))
        make_face()
    extrude(amount=-F2_T65_DEPTH)

    # F2_s66 → F2_t67 (cut, symmetric)
    with BuildSketch(Plane.XY.offset(6.4)):
        Circle(F2_S66_R)
    extrude(amount=F2_T67_DEPTH, both=True, mode=Mode.SUBTRACT)


with BuildPart() as f2_tool68:
    # F2_s69 → F2_t70 (new body)
    with BuildSketch(Plane(origin=(-18.1308748909, -31.4035964967, 0), x_dir=(0, 0, 1), z_dir=(0.5, 0.8660254038, 0))):
        with BuildLine():
            ThreePointArc((5.715, 1.4279316793), (6.6130256121, 1.0559572914), (6.985, 0.1579316793))
            Line((6.985, 0.1579316793), (6.985, 1.4279316793))
            Line((6.985, 1.4279316793), (5.715, 1.4279316793))
        make_face()
    extrude(amount=F2_T70_DEPTH)

    # F2_s71 → F2_t72 (cut, symmetric)
    with BuildSketch(Plane.XY.offset(6.4)):
        Circle(F2_S71_R)
    extrude(amount=F2_T72_DEPTH, both=True, mode=Mode.SUBTRACT)


with BuildPart() as f2_tool74:
    # F2_s75 → F2_t76 (new body)
    with BuildSketch(Plane(origin=(-18.1308748909, 31.4035964967, 0), x_dir=(0, 0, 1), z_dir=(0.5, -0.8660254038, 0))):
        with BuildLine():
            ThreePointArc((5.715, 1.4279316793), (6.6130256121, 1.0559572914), (6.985, 0.1579316793))
            Line((6.985, 0.1579316793), (6.985, 1.4279316793))
            Line((6.985, 1.4279316793), (5.715, 1.4279316793))
        make_face()
    extrude(amount=F2_T76_DEPTH)

    # F2_s77 → F2_t78 (intersect, symmetric)
    with BuildSketch(Plane.XY.offset(6.4)):
        Circle(F2_S77_R)
    extrude(amount=F2_T78_DEPTH, both=True, mode=Mode.INTERSECT)


with BuildPart() as f2_tool79:
    # F2_s80 → F2_t81 (revolve)
    with BuildSketch(Plane(origin=(0, 0, 0), x_dir=(0, 0, 1), z_dir=(0.9170952167, 0.3986682375, 0))):
        with BuildLine():
            ThreePointArc((5.715, -15.3732097417), (6.6130256121, -15.0012353538), (6.985, -14.1032097417))
            Line((6.985, -14.1032097417), (6.985, -15.3732097417))
            Line((6.985, -15.3732097417), (5.715, -15.3732097417))
        make_face()
    revolve(axis=Axis((0, 0, 6.985), (0, 0, 1)), revolution_arc=F2_T81_ANGLE)

    split(bisect_by=Plane(origin=(-1.2366251091, -0.7139658396, 0), x_dir=(0, 0, 1), z_dir=(0.8660254038, 0.5, 0)), keep=Keep.TOP)


with BuildPart() as f2_tool74_1:
    add(f2_tool74.part)

    # F2_t83: intersect F2_tool79
    add(f2_tool79.part, mode=Mode.INTERSECT)


with BuildPart() as f2_tool85:
    # F2_s86 → F2_t87 (new body)
    with BuildSketch(Plane(origin=(6.0658748909, 10.5064035033, 0), x_dir=(0, 0, 1), z_dir=(0.5, 0.8660254038, 0))):
        with BuildLine():
            ThreePointArc((5.715, 1.4279316793), (6.6130256121, 1.0559572914), (6.985, 0.1579316793))
            Line((6.985, 0.1579316793), (6.985, 1.4279316793))
            Line((6.985, 1.4279316793), (5.715, 1.4279316793))
        make_face()
    extrude(amount=F2_T87_DEPTH)

    # F2_s88 → F2_t89 (intersect, symmetric)
    with BuildSketch(Plane.XY.offset(6.4)):
        Circle(F2_S88_R)
    extrude(amount=F2_T89_DEPTH, both=True, mode=Mode.INTERSECT)


with BuildPart() as f2_tool90:
    # F2_s91 → F2_t92 (revolve)
    with BuildSketch(Plane(origin=(0, 0, 0), x_dir=(0, 0, 1), z_dir=(-0.113290787, -0.9935618741, 0))):
        with BuildLine():
            ThreePointArc((5.715, -15.3732097417), (6.6130256121, -15.0012353538), (6.985, -14.1032097417))
            Line((6.985, -14.1032097417), (6.985, -15.3732097417))
            Line((6.985, -15.3732097417), (5.715, -15.3732097417))
        make_face()
    revolve(axis=Axis((0, 0, 6.985), (0, 0, 1)), revolution_arc=F2_T92_ANGLE)

    split(bisect_by=Plane(origin=(1.2366251091, -0.7139658396, 0), x_dir=(0, 0, 1), z_dir=(-0.8660254038, 0.5, 0)), keep=Keep.TOP)


with BuildPart() as f2_tool85_1:
    add(f2_tool85.part)

    # F2_t94: intersect F2_tool90
    add(f2_tool90.part, mode=Mode.INTERSECT)


with BuildPart() as f2_tool96:
    # F2_s97 → F2_t98 (new body)
    with BuildSketch(Plane.YZ.offset(36.2617497817)):
        with BuildLine():
            ThreePointArc((1.4279316793, 5.715), (1.0559572914, 6.6130256121), (0.1579316793, 6.985))
            Line((0.1579316793, 6.985), (1.4279316793, 6.985))
            Line((1.4279316793, 6.985), (1.4279316793, 5.715))
        make_face()
    extrude(amount=-F2_T98_DEPTH)

    # F2_s99 → F2_t100 (intersect, symmetric)
    with BuildSketch(Plane.XY.offset(6.4)):
        Circle(F2_S99_R)
    extrude(amount=F2_T100_DEPTH, both=True, mode=Mode.INTERSECT)


with BuildPart() as f2_tool101:
    # F2_s102 → F2_t103 (revolve)
    with BuildSketch(Plane(origin=(0, 0, 0), x_dir=(0, 0, 1), z_dir=(-0.113290787, -0.9935618741, 0))):
        with BuildLine():
            ThreePointArc((5.715, -15.3732097417), (6.6130256121, -15.0012353538), (6.985, -14.1032097417))
            Line((6.985, -14.1032097417), (6.985, -15.3732097417))
            Line((6.985, -15.3732097417), (5.715, -15.3732097417))
        make_face()
    revolve(axis=Axis((0, 0, 6.985), (0, 0, 1)), revolution_arc=F2_T103_ANGLE)

    split(bisect_by=Plane.XZ.offset(-1.4279316793), keep=Keep.TOP)


with BuildPart() as f2_tool96_1:
    add(f2_tool96.part)

    # F2_t105: intersect F2_tool101
    add(f2_tool101.part, mode=Mode.INTERSECT)


with BuildPart() as f2_tool107:
    # F2_s108 → F2_t109 (revolve)
    with BuildSketch(Plane(origin=(0, 0, 0), x_dir=(0, 0, 1), z_dir=(0.9170952167, 0.3986682375, 0))):
        with BuildLine():
            ThreePointArc((5.715, -15.3732097417), (6.6130256121, -15.0012353538), (6.985, -14.1032097417))
            Line((6.985, -14.1032097417), (6.985, -15.3732097417))
            Line((6.985, -15.3732097417), (5.715, -15.3732097417))
        make_face()
    revolve(axis=Axis((0, 0, 6.985), (0, 0, 1)), revolution_arc=F2_T109_ANGLE)

    split(bisect_by=Plane.XZ.offset(-1.4279316793), keep=Keep.TOP)


with BuildPart() as f2_tool111:
    # F2_s112 → F2_t113 (new body)
    with BuildSketch(Plane.YZ.offset(-12.1317497817)):
        with BuildLine():
            ThreePointArc((1.4279316793, 5.715), (1.0559572914, 6.6130256121), (0.1579316793, 6.985))
            Line((0.1579316793, 6.985), (1.4279316793, 6.985))
            Line((1.4279316793, 6.985), (1.4279316793, 5.715))
        make_face()
    extrude(amount=-F2_T113_DEPTH)

    # F2_s114 → F2_t115 (intersect, symmetric)
    with BuildSketch(Plane.XY.offset(6.4)):
        Circle(F2_S114_R)
    extrude(amount=F2_T115_DEPTH, both=True, mode=Mode.INTERSECT)


with BuildPart() as f2_tool107_1:
    add(f2_tool107.part)

    # F2_t116: intersect F2_tool111
    add(f2_tool111.part, mode=Mode.INTERSECT)


with BuildPart() as f2_tool118:
    # F2_s119 → F2_t120 (new body)
    with BuildSketch(Plane(origin=(-18.1308748909, -31.4035964967, 0), x_dir=(0, 0, 1), z_dir=(0.5, 0.8660254038, 0))):
        with BuildLine():
            ThreePointArc((5.715, 1.4279316793), (6.6130256121, 1.0559572914), (6.985, 0.1579316793))
            Line((6.985, 0.1579316793), (6.985, 1.4279316793))
            Line((6.985, 1.4279316793), (5.715, 1.4279316793))
        make_face()
    extrude(amount=F2_T120_DEPTH)

    # F2_s121 → F2_t122 (intersect, symmetric)
    with BuildSketch(Plane.XY.offset(6.4)):
        Circle(F2_S121_R)
    extrude(amount=F2_T122_DEPTH, both=True, mode=Mode.INTERSECT)


with BuildPart() as f2_tool123:
    # F2_s124 → F2_t125 (revolve)
    with BuildSketch(Plane(origin=(0, 0, 0), x_dir=(0, 0, 1), z_dir=(-0.8038044297, 0.5948936366, 0))):
        with BuildLine():
            ThreePointArc((5.715, -15.3732097417), (6.6130256121, -15.0012353538), (6.985, -14.1032097417))
            Line((6.985, -14.1032097417), (6.985, -15.3732097417))
            Line((6.985, -15.3732097417), (5.715, -15.3732097417))
        make_face()
    revolve(axis=Axis((0, 0, 6.985), (0, 0, 1)), revolution_arc=F2_T125_ANGLE)

    split(bisect_by=Plane(origin=(1.2366251091, -0.7139658396, 0), x_dir=(0, 0, 1), z_dir=(-0.8660254038, 0.5, 0)), keep=Keep.TOP)


with BuildPart() as f2_tool118_1:
    add(f2_tool118.part)

    # F2_t127: intersect F2_tool123
    add(f2_tool123.part, mode=Mode.INTERSECT)


with BuildPart() as f2_tool129:
    # F2_s130 → F2_t131 (revolve)
    with BuildSketch(Plane(origin=(0, 0, 0), x_dir=(0, 0, 1), z_dir=(-0.8038044297, 0.5948936366, 0))):
        with BuildLine():
            ThreePointArc((5.715, -15.3732097417), (6.6130256121, -15.0012353538), (6.985, -14.1032097417))
            Line((6.985, -14.1032097417), (6.985, -15.3732097417))
            Line((6.985, -15.3732097417), (5.715, -15.3732097417))
        make_face()
    revolve(axis=Axis((0, 0, 6.985), (0, 0, 1)), revolution_arc=F2_T131_ANGLE)

    split(bisect_by=Plane(origin=(-1.2366251091, -0.7139658396, 0), x_dir=(0, 0, 1), z_dir=(0.8660254038, 0.5, 0)), keep=Keep.TOP)


with BuildPart() as f2_tool133:
    # F2_s134 → F2_t135 (new body)
    with BuildSketch(Plane(origin=(6.0658748909, -10.5064035033, 0), x_dir=(0, 0, 1), z_dir=(0.5, -0.8660254038, 0))):
        with BuildLine():
            ThreePointArc((5.715, 1.4279316793), (6.6130256121, 1.0559572914), (6.985, 0.1579316793))
            Line((6.985, 0.1579316793), (6.985, 1.4279316793))
            Line((6.985, 1.4279316793), (5.715, 1.4279316793))
        make_face()
    extrude(amount=F2_T135_DEPTH)

    # F2_s136 → F2_t137 (intersect, symmetric)
    with BuildSketch(Plane.XY.offset(6.4)):
        Circle(F2_S136_R)
    extrude(amount=F2_T137_DEPTH, both=True, mode=Mode.INTERSECT)


with BuildPart() as f2_tool129_1:
    add(f2_tool129.part)

    # F2_t138: intersect F2_tool133
    add(f2_tool133.part, mode=Mode.INTERSECT)


with BuildPart() as f1_1:
    add(f1.part)

    # F2_t139: cut F2_tool1, F2_tool6, F2_tool9, F2_tool12, F2_tool15, F2_tool20, F2_tool25, F2_tool30, F2_tool35, F2_tool38, F2_tool41, F2_tool44, F2_tool49, F2_tool54, F2_tool57, F2_tool60, F2_tool63, F2_tool68, F2_tool74, F2_tool85, F2_tool96, F2_tool107, F2_tool118, F2_tool129
    add([f2_tool1.part, f2_tool6.part, f2_tool9.part, f2_tool12.part, f2_tool15.part, f2_tool20.part, f2_tool25.part, f2_tool30.part, f2_tool35.part, f2_tool38.part, f2_tool41.part, f2_tool44.part, f2_tool49.part, f2_tool54.part, f2_tool57.part, f2_tool60.part, f2_tool63.part, f2_tool68.part, f2_tool74_1.part, f2_tool85_1.part, f2_tool96_1.part, f2_tool107_1.part, f2_tool118_1.part, f2_tool129_1.part], mode=Mode.SUBTRACT)

    # F3
    f3_edges = [f1_1.edges().sort_by_distance(p)[0] for p in [
        (-24.19675, -29.367932, 0),
        (-10.86175, -21.668966, 0),
        (-37.53175, -21.668966, 0),
        (-37.53175, -6.271034, 0),
        (-24.19675, 1.427932, 0),
        (-13.31359, 7.686605, 0),
        (-13.335, 20.241034, 0),
        (-13.335, 35.638966, 0),
        (0, 43.337932, 0),
        (13.335, 35.638966, 0),
        (13.335, 20.241034, 0),
        (13.31359, 7.686605, 0),
        (24.19675, 1.427932, 0),
        (37.53175, -6.271034, 0),
        (37.53175, -21.668966, 0),
        (24.19675, -29.367932, 0),
        (10.86175, -21.668966, 0),
        (0, -15.37321, 0),
    ]]
    fillet(f3_edges, radius=F3_R)


solid = f1_1.part
